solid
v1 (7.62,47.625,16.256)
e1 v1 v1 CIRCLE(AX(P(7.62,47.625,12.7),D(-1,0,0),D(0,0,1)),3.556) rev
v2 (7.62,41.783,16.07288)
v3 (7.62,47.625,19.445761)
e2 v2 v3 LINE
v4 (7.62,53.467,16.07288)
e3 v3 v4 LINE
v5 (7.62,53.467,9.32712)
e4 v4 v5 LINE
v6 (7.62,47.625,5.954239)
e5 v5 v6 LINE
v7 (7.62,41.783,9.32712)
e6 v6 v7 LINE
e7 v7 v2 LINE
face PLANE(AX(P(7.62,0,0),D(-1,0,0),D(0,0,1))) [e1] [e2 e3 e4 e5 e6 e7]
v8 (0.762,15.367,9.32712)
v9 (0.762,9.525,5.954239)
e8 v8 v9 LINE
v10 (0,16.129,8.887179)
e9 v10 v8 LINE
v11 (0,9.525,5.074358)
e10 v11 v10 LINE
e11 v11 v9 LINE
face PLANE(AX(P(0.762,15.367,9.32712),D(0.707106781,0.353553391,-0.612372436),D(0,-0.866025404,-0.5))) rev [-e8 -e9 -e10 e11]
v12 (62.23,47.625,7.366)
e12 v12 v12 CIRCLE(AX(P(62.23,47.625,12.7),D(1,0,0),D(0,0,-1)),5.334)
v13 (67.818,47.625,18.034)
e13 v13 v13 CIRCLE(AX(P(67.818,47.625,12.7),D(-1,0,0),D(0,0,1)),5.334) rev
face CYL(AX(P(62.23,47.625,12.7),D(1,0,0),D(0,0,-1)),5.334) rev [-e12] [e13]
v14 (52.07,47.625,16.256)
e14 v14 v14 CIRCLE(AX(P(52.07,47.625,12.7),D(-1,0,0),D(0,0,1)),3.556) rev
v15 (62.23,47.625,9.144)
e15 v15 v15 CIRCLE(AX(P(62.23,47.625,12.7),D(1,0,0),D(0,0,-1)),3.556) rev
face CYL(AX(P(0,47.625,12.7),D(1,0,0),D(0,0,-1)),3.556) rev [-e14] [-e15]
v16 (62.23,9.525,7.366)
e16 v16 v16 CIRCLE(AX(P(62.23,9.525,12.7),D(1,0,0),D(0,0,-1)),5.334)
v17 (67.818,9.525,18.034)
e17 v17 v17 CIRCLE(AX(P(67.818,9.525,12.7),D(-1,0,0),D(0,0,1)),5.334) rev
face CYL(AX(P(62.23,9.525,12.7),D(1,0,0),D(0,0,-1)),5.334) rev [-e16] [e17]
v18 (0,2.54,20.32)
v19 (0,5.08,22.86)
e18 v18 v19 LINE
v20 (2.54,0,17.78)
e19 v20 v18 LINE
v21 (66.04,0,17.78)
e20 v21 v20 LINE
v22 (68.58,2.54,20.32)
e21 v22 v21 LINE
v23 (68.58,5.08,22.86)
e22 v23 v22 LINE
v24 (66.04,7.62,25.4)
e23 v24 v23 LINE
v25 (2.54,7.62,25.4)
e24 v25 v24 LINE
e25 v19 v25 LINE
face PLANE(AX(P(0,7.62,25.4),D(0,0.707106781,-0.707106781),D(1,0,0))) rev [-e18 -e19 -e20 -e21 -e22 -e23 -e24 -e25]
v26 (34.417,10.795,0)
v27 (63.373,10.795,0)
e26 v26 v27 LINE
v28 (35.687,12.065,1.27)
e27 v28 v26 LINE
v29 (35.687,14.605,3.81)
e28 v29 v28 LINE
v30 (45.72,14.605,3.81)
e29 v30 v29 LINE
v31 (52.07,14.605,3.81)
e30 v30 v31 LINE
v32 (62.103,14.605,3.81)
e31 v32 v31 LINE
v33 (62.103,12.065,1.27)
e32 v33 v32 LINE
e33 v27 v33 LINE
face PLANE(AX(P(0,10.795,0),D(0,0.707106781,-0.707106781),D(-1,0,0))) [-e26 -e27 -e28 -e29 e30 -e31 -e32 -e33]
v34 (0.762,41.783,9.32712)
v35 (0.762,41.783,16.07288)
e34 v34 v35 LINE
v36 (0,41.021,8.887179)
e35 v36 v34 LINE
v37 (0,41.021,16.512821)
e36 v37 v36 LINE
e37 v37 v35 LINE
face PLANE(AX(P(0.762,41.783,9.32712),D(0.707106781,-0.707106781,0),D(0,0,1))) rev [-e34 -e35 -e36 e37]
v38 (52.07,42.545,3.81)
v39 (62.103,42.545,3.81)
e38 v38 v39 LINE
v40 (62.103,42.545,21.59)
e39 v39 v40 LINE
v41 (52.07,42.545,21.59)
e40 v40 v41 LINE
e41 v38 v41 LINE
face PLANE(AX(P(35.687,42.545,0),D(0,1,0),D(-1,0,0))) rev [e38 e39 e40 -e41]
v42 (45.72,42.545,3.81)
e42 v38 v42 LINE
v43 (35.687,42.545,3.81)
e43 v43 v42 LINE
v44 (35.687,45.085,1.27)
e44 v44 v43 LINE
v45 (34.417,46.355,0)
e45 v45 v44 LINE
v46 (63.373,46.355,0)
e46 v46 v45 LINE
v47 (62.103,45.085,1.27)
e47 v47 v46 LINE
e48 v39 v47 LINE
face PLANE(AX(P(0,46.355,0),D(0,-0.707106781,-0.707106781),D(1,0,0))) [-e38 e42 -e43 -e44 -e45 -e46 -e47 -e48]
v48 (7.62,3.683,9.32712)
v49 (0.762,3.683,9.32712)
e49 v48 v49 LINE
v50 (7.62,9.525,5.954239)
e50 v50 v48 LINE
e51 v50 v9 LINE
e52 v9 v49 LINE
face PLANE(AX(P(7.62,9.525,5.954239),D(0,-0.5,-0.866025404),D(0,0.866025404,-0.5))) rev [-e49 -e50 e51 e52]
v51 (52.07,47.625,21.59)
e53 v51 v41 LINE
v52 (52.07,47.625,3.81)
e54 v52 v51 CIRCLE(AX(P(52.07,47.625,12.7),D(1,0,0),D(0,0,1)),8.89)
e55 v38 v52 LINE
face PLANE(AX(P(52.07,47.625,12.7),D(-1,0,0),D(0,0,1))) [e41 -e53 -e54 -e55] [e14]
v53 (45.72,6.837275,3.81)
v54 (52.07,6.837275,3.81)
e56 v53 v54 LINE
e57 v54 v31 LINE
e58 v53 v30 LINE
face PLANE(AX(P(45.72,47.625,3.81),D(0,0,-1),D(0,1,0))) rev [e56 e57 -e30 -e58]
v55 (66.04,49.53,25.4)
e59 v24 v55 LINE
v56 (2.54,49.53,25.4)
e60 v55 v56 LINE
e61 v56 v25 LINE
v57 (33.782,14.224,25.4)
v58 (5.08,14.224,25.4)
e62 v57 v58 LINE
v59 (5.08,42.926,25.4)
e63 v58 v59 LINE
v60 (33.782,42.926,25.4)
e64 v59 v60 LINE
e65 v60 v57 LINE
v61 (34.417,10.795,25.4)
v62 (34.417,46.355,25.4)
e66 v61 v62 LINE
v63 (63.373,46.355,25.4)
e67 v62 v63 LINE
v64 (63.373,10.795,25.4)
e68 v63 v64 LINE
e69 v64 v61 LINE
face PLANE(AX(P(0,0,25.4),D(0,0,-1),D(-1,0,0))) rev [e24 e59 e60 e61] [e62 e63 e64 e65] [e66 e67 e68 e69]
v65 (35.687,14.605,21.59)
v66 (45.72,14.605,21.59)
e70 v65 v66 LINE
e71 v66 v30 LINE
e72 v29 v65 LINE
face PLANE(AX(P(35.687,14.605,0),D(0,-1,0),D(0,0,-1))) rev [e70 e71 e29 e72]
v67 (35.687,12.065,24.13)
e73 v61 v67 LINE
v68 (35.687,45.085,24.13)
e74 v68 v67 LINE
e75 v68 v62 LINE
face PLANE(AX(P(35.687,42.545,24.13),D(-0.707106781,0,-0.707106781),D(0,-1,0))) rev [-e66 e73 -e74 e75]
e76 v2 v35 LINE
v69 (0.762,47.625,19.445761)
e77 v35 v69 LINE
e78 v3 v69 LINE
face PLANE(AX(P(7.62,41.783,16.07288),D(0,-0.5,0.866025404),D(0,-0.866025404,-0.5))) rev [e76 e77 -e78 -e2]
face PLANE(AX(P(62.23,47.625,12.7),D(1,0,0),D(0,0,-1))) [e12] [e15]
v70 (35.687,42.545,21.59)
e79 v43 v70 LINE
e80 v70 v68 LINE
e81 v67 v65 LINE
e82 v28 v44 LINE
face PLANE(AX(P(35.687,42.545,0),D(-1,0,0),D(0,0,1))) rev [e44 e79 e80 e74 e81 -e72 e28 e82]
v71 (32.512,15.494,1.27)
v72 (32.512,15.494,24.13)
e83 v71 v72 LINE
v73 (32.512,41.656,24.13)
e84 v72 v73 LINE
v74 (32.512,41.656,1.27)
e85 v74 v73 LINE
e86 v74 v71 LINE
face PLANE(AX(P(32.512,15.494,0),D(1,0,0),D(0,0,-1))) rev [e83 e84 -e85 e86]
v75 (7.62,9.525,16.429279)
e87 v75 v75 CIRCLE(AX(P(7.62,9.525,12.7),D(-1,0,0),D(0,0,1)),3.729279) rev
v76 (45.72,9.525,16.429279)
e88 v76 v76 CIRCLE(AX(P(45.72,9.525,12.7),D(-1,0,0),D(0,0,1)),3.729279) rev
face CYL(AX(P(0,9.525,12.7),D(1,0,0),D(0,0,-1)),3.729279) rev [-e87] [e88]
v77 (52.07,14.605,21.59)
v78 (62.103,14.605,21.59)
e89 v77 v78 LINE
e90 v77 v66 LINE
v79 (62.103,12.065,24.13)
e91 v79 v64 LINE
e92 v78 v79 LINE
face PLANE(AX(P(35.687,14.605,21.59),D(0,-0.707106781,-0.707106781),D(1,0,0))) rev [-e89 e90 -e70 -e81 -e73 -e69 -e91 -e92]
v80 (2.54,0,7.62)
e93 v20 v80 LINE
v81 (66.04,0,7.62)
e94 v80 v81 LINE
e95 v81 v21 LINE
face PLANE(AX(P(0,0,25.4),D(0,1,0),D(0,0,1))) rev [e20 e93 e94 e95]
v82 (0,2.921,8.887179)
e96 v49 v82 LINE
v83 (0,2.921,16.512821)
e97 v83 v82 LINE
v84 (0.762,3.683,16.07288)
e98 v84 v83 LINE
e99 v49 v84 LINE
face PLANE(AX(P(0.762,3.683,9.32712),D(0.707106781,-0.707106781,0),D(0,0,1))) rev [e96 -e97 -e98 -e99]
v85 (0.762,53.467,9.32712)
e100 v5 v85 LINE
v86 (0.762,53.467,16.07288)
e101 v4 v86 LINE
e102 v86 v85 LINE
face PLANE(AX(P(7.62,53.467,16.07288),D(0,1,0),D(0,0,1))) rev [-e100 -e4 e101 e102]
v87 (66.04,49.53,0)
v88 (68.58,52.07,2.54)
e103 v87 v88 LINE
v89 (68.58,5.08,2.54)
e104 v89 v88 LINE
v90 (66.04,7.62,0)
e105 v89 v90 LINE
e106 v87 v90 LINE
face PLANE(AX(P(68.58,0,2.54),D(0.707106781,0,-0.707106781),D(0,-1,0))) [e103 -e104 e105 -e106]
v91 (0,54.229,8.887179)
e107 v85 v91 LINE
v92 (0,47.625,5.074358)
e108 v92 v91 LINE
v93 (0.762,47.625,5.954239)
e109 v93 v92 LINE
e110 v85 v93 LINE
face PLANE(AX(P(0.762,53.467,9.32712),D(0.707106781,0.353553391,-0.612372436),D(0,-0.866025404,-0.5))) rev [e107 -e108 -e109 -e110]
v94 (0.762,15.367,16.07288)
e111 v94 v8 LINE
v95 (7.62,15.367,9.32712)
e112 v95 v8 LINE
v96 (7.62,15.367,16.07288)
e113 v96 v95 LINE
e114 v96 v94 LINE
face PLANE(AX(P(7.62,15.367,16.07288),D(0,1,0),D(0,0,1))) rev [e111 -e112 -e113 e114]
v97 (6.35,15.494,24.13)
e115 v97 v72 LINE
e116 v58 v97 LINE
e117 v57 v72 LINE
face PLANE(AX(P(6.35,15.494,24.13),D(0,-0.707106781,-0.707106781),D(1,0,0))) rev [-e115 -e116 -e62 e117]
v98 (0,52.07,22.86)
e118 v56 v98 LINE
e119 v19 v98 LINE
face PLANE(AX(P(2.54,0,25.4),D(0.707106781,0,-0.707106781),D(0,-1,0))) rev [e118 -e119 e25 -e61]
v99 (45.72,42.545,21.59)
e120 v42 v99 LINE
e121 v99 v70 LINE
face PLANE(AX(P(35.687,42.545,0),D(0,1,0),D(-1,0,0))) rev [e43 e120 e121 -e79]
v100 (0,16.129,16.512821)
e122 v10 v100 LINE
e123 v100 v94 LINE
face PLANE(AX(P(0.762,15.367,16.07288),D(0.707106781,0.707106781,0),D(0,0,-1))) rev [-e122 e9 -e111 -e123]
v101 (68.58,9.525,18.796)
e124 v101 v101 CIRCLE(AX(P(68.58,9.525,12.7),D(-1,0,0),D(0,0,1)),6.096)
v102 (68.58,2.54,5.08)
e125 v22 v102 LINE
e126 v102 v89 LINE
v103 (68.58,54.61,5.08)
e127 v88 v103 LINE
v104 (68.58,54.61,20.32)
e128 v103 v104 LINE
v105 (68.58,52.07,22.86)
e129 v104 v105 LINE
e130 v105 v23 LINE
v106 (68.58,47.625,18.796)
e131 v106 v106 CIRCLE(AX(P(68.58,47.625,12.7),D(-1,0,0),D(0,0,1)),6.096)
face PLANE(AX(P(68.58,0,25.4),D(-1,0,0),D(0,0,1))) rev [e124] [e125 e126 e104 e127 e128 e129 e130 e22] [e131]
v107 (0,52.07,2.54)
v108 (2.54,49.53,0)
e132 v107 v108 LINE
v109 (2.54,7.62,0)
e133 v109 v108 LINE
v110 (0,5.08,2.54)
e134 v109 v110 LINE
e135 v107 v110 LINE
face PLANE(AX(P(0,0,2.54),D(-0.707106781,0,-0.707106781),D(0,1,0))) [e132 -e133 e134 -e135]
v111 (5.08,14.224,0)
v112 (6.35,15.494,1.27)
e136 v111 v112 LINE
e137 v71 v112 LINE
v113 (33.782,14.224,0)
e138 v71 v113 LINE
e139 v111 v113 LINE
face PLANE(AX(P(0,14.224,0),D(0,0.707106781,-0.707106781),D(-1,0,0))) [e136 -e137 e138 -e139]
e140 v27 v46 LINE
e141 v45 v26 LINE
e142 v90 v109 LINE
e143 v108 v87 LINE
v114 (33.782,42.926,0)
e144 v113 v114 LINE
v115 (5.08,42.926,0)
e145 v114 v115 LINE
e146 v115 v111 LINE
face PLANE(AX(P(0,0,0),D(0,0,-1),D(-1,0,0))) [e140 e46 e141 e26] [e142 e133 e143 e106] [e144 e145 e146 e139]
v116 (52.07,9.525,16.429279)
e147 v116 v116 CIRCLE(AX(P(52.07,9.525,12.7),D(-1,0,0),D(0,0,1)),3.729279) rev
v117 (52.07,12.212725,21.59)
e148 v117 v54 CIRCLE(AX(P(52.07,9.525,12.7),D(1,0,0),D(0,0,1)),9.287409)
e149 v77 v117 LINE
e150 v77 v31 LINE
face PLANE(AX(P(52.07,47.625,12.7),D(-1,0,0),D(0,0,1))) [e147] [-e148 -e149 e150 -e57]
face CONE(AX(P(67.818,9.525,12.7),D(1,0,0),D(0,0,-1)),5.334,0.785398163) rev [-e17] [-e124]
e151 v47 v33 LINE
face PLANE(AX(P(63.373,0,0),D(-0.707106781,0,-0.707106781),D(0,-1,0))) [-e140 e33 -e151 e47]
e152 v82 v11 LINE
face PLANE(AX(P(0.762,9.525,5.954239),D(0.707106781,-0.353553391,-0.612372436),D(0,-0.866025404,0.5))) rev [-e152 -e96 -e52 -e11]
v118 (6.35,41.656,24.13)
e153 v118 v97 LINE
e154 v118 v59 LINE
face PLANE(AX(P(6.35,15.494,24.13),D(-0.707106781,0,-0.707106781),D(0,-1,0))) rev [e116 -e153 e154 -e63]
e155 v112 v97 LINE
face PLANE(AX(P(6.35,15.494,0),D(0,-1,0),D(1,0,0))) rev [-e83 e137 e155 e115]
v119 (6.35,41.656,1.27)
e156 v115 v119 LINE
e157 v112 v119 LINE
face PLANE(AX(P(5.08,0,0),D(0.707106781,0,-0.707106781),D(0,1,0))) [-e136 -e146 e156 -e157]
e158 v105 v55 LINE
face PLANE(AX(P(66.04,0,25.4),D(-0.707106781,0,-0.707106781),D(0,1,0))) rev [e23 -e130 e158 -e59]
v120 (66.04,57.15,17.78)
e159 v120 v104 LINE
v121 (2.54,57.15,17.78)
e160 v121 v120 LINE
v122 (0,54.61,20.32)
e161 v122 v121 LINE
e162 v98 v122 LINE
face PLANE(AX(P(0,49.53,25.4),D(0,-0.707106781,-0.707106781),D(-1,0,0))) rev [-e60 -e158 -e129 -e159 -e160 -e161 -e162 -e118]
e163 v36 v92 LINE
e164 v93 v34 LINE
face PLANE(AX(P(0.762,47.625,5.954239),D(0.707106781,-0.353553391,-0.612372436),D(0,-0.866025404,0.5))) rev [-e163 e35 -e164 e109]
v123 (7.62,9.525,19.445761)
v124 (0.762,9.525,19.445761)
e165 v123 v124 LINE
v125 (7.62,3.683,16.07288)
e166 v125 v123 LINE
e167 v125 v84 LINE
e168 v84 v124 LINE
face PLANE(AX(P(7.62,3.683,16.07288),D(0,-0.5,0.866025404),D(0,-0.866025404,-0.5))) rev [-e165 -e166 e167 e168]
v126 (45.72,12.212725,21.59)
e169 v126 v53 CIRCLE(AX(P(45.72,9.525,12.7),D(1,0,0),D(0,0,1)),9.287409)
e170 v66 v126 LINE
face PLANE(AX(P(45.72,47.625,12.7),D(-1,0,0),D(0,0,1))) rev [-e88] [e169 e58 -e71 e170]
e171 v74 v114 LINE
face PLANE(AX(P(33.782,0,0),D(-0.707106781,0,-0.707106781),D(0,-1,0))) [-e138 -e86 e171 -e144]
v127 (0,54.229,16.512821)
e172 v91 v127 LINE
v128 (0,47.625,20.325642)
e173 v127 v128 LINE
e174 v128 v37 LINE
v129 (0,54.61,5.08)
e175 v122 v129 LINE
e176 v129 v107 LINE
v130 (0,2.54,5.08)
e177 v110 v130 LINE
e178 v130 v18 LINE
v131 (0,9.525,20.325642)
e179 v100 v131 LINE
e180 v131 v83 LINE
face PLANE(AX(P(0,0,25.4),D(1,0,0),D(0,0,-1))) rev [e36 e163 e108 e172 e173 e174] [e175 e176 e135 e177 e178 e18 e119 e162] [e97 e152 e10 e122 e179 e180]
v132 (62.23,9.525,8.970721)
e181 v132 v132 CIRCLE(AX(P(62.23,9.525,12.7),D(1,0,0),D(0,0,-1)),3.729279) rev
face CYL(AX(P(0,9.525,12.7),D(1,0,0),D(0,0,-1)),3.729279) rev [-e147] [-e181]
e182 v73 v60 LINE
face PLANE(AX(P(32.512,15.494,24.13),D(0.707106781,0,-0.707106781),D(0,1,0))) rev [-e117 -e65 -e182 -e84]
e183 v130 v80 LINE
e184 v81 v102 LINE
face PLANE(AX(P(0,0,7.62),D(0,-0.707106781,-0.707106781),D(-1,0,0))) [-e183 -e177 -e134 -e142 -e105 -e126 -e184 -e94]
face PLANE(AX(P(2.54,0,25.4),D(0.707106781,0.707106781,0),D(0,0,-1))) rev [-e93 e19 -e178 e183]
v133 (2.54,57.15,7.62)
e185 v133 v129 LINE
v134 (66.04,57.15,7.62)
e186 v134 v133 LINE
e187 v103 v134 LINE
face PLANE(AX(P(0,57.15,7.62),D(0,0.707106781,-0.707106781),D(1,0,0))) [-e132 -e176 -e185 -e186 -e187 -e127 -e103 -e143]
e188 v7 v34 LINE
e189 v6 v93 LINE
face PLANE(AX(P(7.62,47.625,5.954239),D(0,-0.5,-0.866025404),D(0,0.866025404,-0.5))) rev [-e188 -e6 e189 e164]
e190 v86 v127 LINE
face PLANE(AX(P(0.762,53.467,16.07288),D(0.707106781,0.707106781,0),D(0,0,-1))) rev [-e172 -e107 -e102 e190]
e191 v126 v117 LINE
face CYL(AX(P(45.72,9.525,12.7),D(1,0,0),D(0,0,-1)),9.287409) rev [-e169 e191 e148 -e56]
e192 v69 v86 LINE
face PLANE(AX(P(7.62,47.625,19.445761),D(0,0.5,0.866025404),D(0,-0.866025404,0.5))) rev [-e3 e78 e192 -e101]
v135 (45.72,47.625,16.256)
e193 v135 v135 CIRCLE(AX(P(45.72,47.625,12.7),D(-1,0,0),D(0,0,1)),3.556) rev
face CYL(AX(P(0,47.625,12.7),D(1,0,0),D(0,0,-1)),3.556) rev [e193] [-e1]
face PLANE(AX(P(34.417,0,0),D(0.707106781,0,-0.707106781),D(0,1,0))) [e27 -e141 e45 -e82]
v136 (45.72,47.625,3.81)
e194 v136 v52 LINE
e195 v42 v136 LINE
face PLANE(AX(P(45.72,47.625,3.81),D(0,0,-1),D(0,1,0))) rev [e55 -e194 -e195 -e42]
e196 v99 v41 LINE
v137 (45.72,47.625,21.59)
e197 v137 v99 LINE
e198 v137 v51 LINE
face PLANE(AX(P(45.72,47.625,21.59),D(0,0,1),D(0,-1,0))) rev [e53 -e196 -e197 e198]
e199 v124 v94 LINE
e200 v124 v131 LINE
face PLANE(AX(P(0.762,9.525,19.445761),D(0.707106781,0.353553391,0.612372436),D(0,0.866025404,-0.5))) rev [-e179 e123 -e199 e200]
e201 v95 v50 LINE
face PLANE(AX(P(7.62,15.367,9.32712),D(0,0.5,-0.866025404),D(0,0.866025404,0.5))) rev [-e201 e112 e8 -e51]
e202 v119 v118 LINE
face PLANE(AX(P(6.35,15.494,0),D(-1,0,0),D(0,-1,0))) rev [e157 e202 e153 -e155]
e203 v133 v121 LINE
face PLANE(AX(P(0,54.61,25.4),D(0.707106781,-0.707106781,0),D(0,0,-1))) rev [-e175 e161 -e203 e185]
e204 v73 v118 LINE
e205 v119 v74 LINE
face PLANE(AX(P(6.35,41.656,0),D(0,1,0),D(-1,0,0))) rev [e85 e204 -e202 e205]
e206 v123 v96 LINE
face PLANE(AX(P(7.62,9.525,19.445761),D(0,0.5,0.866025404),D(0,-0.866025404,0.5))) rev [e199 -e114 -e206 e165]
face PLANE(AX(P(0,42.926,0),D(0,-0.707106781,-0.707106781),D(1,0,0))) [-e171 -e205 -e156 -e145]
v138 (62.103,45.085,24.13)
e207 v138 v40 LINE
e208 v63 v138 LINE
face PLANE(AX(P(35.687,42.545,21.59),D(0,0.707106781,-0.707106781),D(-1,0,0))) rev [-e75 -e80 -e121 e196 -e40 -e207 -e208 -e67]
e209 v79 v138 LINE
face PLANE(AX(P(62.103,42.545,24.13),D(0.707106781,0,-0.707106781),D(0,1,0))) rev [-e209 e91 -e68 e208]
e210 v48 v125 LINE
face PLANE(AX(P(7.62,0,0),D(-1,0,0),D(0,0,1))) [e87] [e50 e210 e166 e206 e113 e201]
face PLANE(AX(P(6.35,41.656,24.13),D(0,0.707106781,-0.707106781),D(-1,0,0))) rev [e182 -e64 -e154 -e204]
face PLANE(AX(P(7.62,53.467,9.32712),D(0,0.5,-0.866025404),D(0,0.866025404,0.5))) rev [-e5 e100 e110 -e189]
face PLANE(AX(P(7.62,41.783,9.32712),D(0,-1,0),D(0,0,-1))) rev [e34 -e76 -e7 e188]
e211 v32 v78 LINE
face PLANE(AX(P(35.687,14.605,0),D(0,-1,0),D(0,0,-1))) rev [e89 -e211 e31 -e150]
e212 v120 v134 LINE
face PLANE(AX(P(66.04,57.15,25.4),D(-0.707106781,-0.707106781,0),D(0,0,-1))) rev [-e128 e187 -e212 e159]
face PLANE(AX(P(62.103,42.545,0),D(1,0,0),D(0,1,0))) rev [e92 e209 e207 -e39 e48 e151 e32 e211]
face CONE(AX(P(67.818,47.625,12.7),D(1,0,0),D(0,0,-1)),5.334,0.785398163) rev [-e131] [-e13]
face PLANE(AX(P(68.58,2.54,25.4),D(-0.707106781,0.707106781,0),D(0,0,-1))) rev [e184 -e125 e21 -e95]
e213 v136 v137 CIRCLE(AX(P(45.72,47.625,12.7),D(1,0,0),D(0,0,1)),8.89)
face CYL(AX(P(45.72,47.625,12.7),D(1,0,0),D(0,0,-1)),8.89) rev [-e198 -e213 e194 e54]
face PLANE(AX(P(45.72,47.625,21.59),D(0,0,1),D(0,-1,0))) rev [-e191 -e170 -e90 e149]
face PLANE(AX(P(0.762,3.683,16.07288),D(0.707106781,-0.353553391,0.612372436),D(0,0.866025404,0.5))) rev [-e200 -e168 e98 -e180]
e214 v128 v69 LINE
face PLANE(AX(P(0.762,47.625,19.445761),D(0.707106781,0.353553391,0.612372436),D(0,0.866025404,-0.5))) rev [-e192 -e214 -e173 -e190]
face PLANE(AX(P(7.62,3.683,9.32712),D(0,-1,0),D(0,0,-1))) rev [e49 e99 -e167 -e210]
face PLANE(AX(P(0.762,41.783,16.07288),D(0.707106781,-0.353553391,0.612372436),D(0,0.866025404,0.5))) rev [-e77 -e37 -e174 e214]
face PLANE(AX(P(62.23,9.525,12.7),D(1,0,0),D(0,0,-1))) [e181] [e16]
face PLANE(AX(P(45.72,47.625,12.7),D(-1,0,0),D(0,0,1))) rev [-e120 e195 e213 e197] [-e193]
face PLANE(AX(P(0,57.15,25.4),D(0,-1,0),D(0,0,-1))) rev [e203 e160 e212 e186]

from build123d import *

# Parameters (mm, degrees)
SKETCH1_W           = 68.58
SKETCH1_H           = 57.15
BOSS_EXTRUDE1_DEPTH = 25.4
SKETCH2_W           = 26.162
SKETCH2_H           = 26.162
SKETCH2_W_2         = 26.416
SKETCH2_H_2         = 27.94
CUT_EXTRUDE1_DEPTH  = 93.814324864
SKETCH5_R           = 3.556
SKETCH5_R_2         = 3.729278609
CUT_EXTRUDE2_DEPTH  = 93.814324864
CUT_EXTRUDE3_START  = -16.51
CUT_EXTRUDE3_DEPTH  = 6.35
CHAMFER1_SIZE       = 1.27
CHAMFER2_SIZE       = 2.54
CHAMFER3_SIZE       = 7.62
SKETCH7_R           = 5.334
CUT_EXTRUDE4_DEPTH  = 6.35
CUT_EXTRUDE5_DEPTH  = 7.62
CHAMFER4_SIZE       = 0.762
CHAMFER5_SIZE       = 3.81


with BuildPart() as part:
    # Sketch1 → Boss-Extrude1 (new body)
    with BuildSketch(Plane.XY):
        with Locations((34.29, 28.575)):
            Rectangle(SKETCH1_W, SKETCH1_H)
    extrude(amount=BOSS_EXTRUDE1_DEPTH)

    # Sketch2 → Cut-Extrude1 (cut, through all)
    with BuildSketch(Plane.XY.offset(25.4)):
        with Locations((19.431, 28.575)):
            Rectangle(SKETCH2_W, SKETCH2_H)
        with Locations((48.895, 28.575)):
            Rectangle(SKETCH2_W_2, SKETCH2_H_2)
    extrude(amount=-CUT_EXTRUDE1_DEPTH, mode=Mode.SUBTRACT)

    # Sketch5 → Cut-Extrude2 (cut, through all)
    with BuildSketch(Plane(origin=(68.58, 0, 0), x_dir=(0, 0, -1), z_dir=(1, 0, 0))):
        with Locations((-12.7, 47.625)):
            Circle(SKETCH5_R)
        with Locations((-12.7, 9.525)):
            Circle(SKETCH5_R_2)
    extrude(amount=-CUT_EXTRUDE2_DEPTH, mode=Mode.SUBTRACT)

    # Sketch6 → Cut-Extrude3 (cut)
    with BuildSketch(Plane(origin=(68.58, 0, 0), x_dir=(0, 0, -1), z_dir=(1, 0, 0)).offset(CUT_EXTRUDE3_START)):
        with BuildLine():
            Line((-21.59, 47.625), (-21.59, 12.21272508))
            ThreePointArc((-21.59, 12.21272508), (-15.38772508, 0.635), (-3.81, 6.83727492))
            Line((-3.81, 6.83727492), (-3.81, 47.625))
            ThreePointArc((-3.81, 47.625), (-12.7, 56.515), (-21.59, 47.625))
        make_face()
    extrude(amount=-CUT_EXTRUDE3_DEPTH, mode=Mode.SUBTRACT)

    # Chamfer1
    chamfer1_edges = [part.edges().sort_by_distance(p)[0] for p in [
        (6.35, 28.575, 0),
        (19.431, 41.656, 0),
        (32.512, 28.575, 0),
        (19.431, 15.494, 0),
        (6.35, 28.575, 25.4),
        (19.431, 15.494, 25.4),
        (32.512, 28.575, 25.4),
        (19.431, 41.656, 25.4),
        (35.687, 28.575, 0),
        (62.103, 28.575, 0),
        (35.687, 28.575, 25.4),
        (62.103, 28.575, 25.4),
    ]]
    chamfer(chamfer1_edges, length=CHAMFER1_SIZE)

    # Chamfer2
    chamfer2_edges = [part.edges().sort_by_distance(p)[0] for p in [
        (68.58, 28.575, 25.4),
        (0, 28.575, 25.4),
        (68.58, 28.575, 0),
        (0, 28.575, 0),
        (0, 57.15, 12.7),
        (68.58, 57.15, 12.7),
        (68.58, 0, 12.7),
        (0, 0, 12.7),
    ]]
    chamfer(chamfer2_edges, length=CHAMFER2_SIZE)

    # Chamfer3
    # the kernel refuses this chamfer: 7.62 mm, written as the material it takes off along each edge
    with BuildSketch(Plane(origin=(-17.056224368, 0, 0), x_dir=(0, 1, 0), z_dir=(1, 0, 0)), Plane(origin=(-17.056224368, 0, 25.4), x_dir=(0, 0, -1), z_dir=(1, 0, 0)), Plane(origin=(85.636224368, 57.15, 0), x_dir=(0, -1, 0), z_dir=(-1, 0, 0)), Plane(origin=(85.636224368, 57.15, 25.4), x_dir=(0, 0, -1), z_dir=(-1, 0, 0))) as chamfer3_piece_1:
        Polygon((CHAMFER3_SIZE, 0), (0, CHAMFER3_SIZE), (0, 0), align=None)
    extrude(amount=102.692448737, mode=Mode.SUBTRACT)

    # Sketch7 → Cut-Extrude4 (cut)
    with BuildSketch(Plane(origin=(68.58, 0, 0), x_dir=(0, 0, -1), z_dir=(1, 0, 0))):
        with Locations((-12.7, 47.625)):
            Circle(SKETCH7_R)
        with Locations((-12.7, 9.525)):
            Circle(SKETCH7_R)
    extrude(amount=-CUT_EXTRUDE4_DEPTH, mode=Mode.SUBTRACT)

    # Sketch9 → Cut-Extrude5 (cut)
    with BuildSketch(Plane.ZY):
        Polygon((16.072880273, 53.467), (9.327119727, 53.467), (5.954239455, 47.625), (9.327119727, 41.783), (16.072880273, 41.783), (19.445760545, 47.625), align=None)
        Polygon((16.072880273, 15.367), (9.327119727, 15.367), (5.954239455, 9.525), (9.327119727, 3.683), (16.072880273, 3.683), (19.445760545, 9.525), align=None)
    extrude(amount=-CUT_EXTRUDE5_DEPTH, mode=Mode.SUBTRACT)

    # Chamfer4
    chamfer4_edges = [part.edges().sort_by_distance(p)[0] for p in [
        (68.58, 47.625, 18.034),
        (68.58, 9.525, 18.034),
        (0, 50.546, 17.759320409),
        (0, 53.467, 12.7),
        (0, 50.546, 7.640679591),
        (0, 44.704, 7.640679591),
        (0, 41.783, 12.7),
        (0, 44.704, 17.759320409),
        (0, 12.446, 17.759320409),
        (0, 15.367, 12.7),
        (0, 12.446, 7.640679591),
        (0, 6.604, 7.640679591),
        (0, 3.683, 12.7),
        (0, 6.604, 17.759320409),
    ]]
    chamfer(chamfer4_edges, length=CHAMFER4_SIZE)

    # Chamfer5
    # the kernel refuses this chamfer: 3.81 mm, written as the material it takes off along each edge
    with BuildSketch(Plane(origin=(24.618887816, 14.605, 0), x_dir=(0, -1, 0), z_dir=(1, 0, 0))) as chamfer5_piece_1_section:
        Polygon((CHAMFER5_SIZE, 0), (0, -CHAMFER5_SIZE), (0, 0), align=None)
    chamfer5_piece_1 = extrude(amount=48.552224368, mode=Mode.PRIVATE)
    chamfer5_piece_1 = split(chamfer5_piece_1, bisect_by=Plane(origin=(29.517943908, 14.605, -4.899056092), z_dir=(-0.7071067811865467, 0, 0.7071067811865483)), keep=Keep.TOP, mode=Mode.PRIVATE)
    chamfer5_piece_1 = split(chamfer5_piece_1, bisect_by=Plane(origin=(35.687, 14.605, 0), z_dir=(1, 0, 0)), keep=Keep.TOP, mode=Mode.PRIVATE)
    add(chamfer5_piece_1, mode=Mode.SUBTRACT)
    with BuildSketch(Plane(origin=(24.618887816, 14.605, 0), x_dir=(0, -1, 0), z_dir=(1, 0, 0))) as chamfer5_piece_2_section:
        Polygon((CHAMFER5_SIZE, 0), (0, -CHAMFER5_SIZE), (0, 0), align=None)
    chamfer5_piece_2 = extrude(amount=48.552224368, mode=Mode.PRIVATE)
    chamfer5_piece_2 = split(chamfer5_piece_2, bisect_by=Plane(origin=(29.517943908, 14.605, -4.899056092), z_dir=(0.7071067811865467, 0, -0.7071067811865483)), keep=Keep.TOP, mode=Mode.PRIVATE)
    chamfer5_piece_2 = split(chamfer5_piece_2, bisect_by=Plane(origin=(35.687, 14.605, 0), z_dir=(-1, 0, 0)), keep=Keep.TOP, mode=Mode.PRIVATE)
    add(chamfer5_piece_2, mode=Mode.SUBTRACT)
    with BuildSketch(Plane(origin=(24.618887816, 14.605, 0), x_dir=(0, -1, 0), z_dir=(1, 0, 0))) as chamfer5_piece_3_section:
        Polygon((CHAMFER5_SIZE, 0), (0, -CHAMFER5_SIZE), (0, 0), align=None)
    chamfer5_piece_3 = extrude(amount=48.552224368, mode=Mode.PRIVATE)
    chamfer5_piece_3 = split(chamfer5_piece_3, bisect_by=Plane(origin=(62.103, 14.605, 0), z_dir=(-1, 0, 0)), keep=Keep.TOP, mode=Mode.PRIVATE)
    chamfer5_piece_3 = split(chamfer5_piece_3, bisect_by=Plane(origin=(43.995943908, 14.605, 19.377056092), z_dir=(-0.7071067811865467, 0, -0.7071067811865483)), keep=Keep.TOP, mode=Mode.PRIVATE)
    chamfer5_piece_3 = split(chamfer5_piece_3, bisect_by=Plane(origin=(29.517943908, 14.605, -4.899056092), z_dir=(0.7071067811865467, 0, -0.7071067811865483)), keep=Keep.TOP, mode=Mode.PRIVATE)
    chamfer5_piece_3 = split(chamfer5_piece_3, bisect_by=Plane(origin=(35.687, 14.605, 0), z_dir=(1, 0, 0)), keep=Keep.TOP, mode=Mode.PRIVATE)
    add(chamfer5_piece_3, mode=Mode.SUBTRACT)
    with BuildSketch(Plane(origin=(24.618887816, 14.605, 0), x_dir=(0, -1, 0), z_dir=(1, 0, 0))) as chamfer5_piece_4_section:
        Polygon((CHAMFER5_SIZE, 0), (0, -CHAMFER5_SIZE), (0, 0), align=None)
    chamfer5_piece_4 = extrude(amount=48.552224368, mode=Mode.PRIVATE)
    chamfer5_piece_4 = split(chamfer5_piece_4, bisect_by=Plane(origin=(62.103, 14.605, 0), z_dir=(-1, 0, 0)), keep=Keep.TOP, mode=Mode.PRIVATE)
    chamfer5_piece_4 = split(chamfer5_piece_4, bisect_by=Plane(origin=(43.995943908, 14.605, 19.377056092), z_dir=(0.7071067811865467, 0, 0.7071067811865483)), keep=Keep.TOP, mode=Mode.PRIVATE)
    add(chamfer5_piece_4, mode=Mode.SUBTRACT)
    with BuildSketch(Plane(origin=(24.618887816, 14.605, 0), x_dir=(0, -1, 0), z_dir=(1, 0, 0))) as chamfer5_piece_5_section:
        Polygon((CHAMFER5_SIZE, 0), (0, -CHAMFER5_SIZE), (0, 0), align=None)
    chamfer5_piece_5 = extrude(amount=48.552224368, mode=Mode.PRIVATE)
    chamfer5_piece_5 = split(chamfer5_piece_5, bisect_by=Plane(origin=(62.103, 14.605, 0), z_dir=(1, 0, 0)), keep=Keep.TOP, mode=Mode.PRIVATE)
    chamfer5_piece_5 = split(chamfer5_piece_5, bisect_by=Plane(origin=(43.995943908, 14.605, 19.377056092), z_dir=(-0.7071067811865467, 0, -0.7071067811865483)), keep=Keep.TOP, mode=Mode.PRIVATE)
    add(chamfer5_piece_5, mode=Mode.SUBTRACT)
    with BuildSketch(Plane(origin=(73.171112184, 42.545, 0), x_dir=(0, 1, 0), z_dir=(-1, 0, 0))) as chamfer5_piece_6_section:
        Polygon((CHAMFER5_SIZE, 0), (0, -CHAMFER5_SIZE), (0, 0), align=None)
    chamfer5_piece_6 = extrude(amount=48.552224368, mode=Mode.PRIVATE)
    chamfer5_piece_6 = split(chamfer5_piece_6, bisect_by=Plane(origin=(68.272056092, 42.545, -4.899056092), z_dir=(0.7071067811865467, 0, 0.7071067811865483)), keep=Keep.TOP, mode=Mode.PRIVATE)
    chamfer5_piece_6 = split(chamfer5_piece_6, bisect_by=Plane(origin=(62.103, 42.545, 0), z_dir=(-1, 0, 0)), keep=Keep.TOP, mode=Mode.PRIVATE)
    add(chamfer5_piece_6, mode=Mode.SUBTRACT)
    with BuildSketch(Plane(origin=(73.171112184, 42.545, 0), x_dir=(0, 1, 0), z_dir=(-1, 0, 0))) as chamfer5_piece_7_section:
        Polygon((CHAMFER5_SIZE, 0), (0, -CHAMFER5_SIZE), (0, 0), align=None)
    chamfer5_piece_7 = extrude(amount=48.552224368, mode=Mode.PRIVATE)
    chamfer5_piece_7 = split(chamfer5_piece_7, bisect_by=Plane(origin=(68.272056092, 42.545, -4.899056092), z_dir=(-0.7071067811865467, 0, -0.7071067811865483)), keep=Keep.TOP, mode=Mode.PRIVATE)
    chamfer5_piece_7 = split(chamfer5_piece_7, bisect_by=Plane(origin=(62.103, 42.545, 0), z_dir=(1, 0, 0)), keep=Keep.TOP, mode=Mode.PRIVATE)
    add(chamfer5_piece_7, mode=Mode.SUBTRACT)
    with BuildSketch(Plane(origin=(73.171112184, 42.545, 0), x_dir=(0, 1, 0), z_dir=(-1, 0, 0))) as chamfer5_piece_8_section:
        Polygon((CHAMFER5_SIZE, 0), (0, -CHAMFER5_SIZE), (0, 0), align=None)
    chamfer5_piece_8 = extrude(amount=48.552224368, mode=Mode.PRIVATE)
    chamfer5_piece_8 = split(chamfer5_piece_8, bisect_by=Plane(origin=(35.687, 42.545, 0), z_dir=(1, 0, 0)), keep=Keep.TOP, mode=Mode.PRIVATE)
    chamfer5_piece_8 = split(chamfer5_piece_8, bisect_by=Plane(origin=(53.794056092, 42.545, 19.377056092), z_dir=(0.7071067811865467, 0, -0.7071067811865483)), keep=Keep.TOP, mode=Mode.PRIVATE)
    chamfer5_piece_8 = split(chamfer5_piece_8, bisect_by=Plane(origin=(68.272056092, 42.545, -4.899056092), z_dir=(-0.7071067811865467, 0, -0.7071067811865483)), keep=Keep.TOP, mode=Mode.PRIVATE)
    chamfer5_piece_8 = split(chamfer5_piece_8, bisect_by=Plane(origin=(62.103, 42.545, 0), z_dir=(-1, 0, 0)), keep=Keep.TOP, mode=Mode.PRIVATE)
    add(chamfer5_piece_8, mode=Mode.SUBTRACT)
    with BuildSketch(Plane(origin=(73.171112184, 42.545, 0), x_dir=(0, 1, 0), z_dir=(-1, 0, 0))) as chamfer5_piece_9_section:
        Polygon((CHAMFER5_SIZE, 0), (0, -CHAMFER5_SIZE), (0, 0), align=None)
    chamfer5_piece_9 = extrude(amount=48.552224368, mode=Mode.PRIVATE)
    chamfer5_piece_9 = split(chamfer5_piece_9, bisect_by=Plane(origin=(35.687, 42.545, 0), z_dir=(1, 0, 0)), keep=Keep.TOP, mode=Mode.PRIVATE)
    chamfer5_piece_9 = split(chamfer5_piece_9, bisect_by=Plane(origin=(53.794056092, 42.545, 19.377056092), z_dir=(-0.7071067811865467, 0, 0.7071067811865483)), keep=Keep.TOP, mode=Mode.PRIVATE)
    add(chamfer5_piece_9, mode=Mode.SUBTRACT)
    with BuildSketch(Plane(origin=(73.171112184, 42.545, 0), x_dir=(0, 1, 0), z_dir=(-1, 0, 0))) as chamfer5_piece_10_section:
        Polygon((CHAMFER5_SIZE, 0), (0, -CHAMFER5_SIZE), (0, 0), align=None)
    chamfer5_piece_10 = extrude(amount=48.552224368, mode=Mode.PRIVATE)
    chamfer5_piece_10 = split(chamfer5_piece_10, bisect_by=Plane(origin=(35.687, 42.545, 0), z_dir=(-1, 0, 0)), keep=Keep.TOP, mode=Mode.PRIVATE)
    chamfer5_piece_10 = split(chamfer5_piece_10, bisect_by=Plane(origin=(53.794056092, 42.545, 19.377056092), z_dir=(0.7071067811865467, 0, -0.7071067811865483)), keep=Keep.TOP, mode=Mode.PRIVATE)
    add(chamfer5_piece_10, mode=Mode.SUBTRACT)
    with BuildSketch(Plane(origin=(73.171112184, 42.545, 25.4), x_dir=(0, 1, 0), z_dir=(-1, 0, 0))) as chamfer5_piece_11_section:
        Polygon((CHAMFER5_SIZE, 0), (0, CHAMFER5_SIZE), (0, 0), align=None)
    chamfer5_piece_11 = extrude(amount=48.552224368, mode=Mode.PRIVATE)
    chamfer5_piece_11 = split(chamfer5_piece_11, bisect_by=Plane(origin=(68.272056092, 42.545, 30.299056092), z_dir=(0.7071067811865465, 0, -0.7071067811865486)), keep=Keep.TOP, mode=Mode.PRIVATE)
    chamfer5_piece_11 = split(chamfer5_piece_11, bisect_by=Plane(origin=(62.103, 42.545, 25.4), z_dir=(-1, 0, 0)), keep=Keep.TOP, mode=Mode.PRIVATE)
    add(chamfer5_piece_11, mode=Mode.SUBTRACT)
    with BuildSketch(Plane(origin=(73.171112184, 42.545, 25.4), x_dir=(0, 1, 0), z_dir=(-1, 0, 0))) as chamfer5_piece_12_section:
        Polygon((CHAMFER5_SIZE, 0), (0, CHAMFER5_SIZE), (0, 0), align=None)
    chamfer5_piece_12 = extrude(amount=48.552224368, mode=Mode.PRIVATE)
    chamfer5_piece_12 = split(chamfer5_piece_12, bisect_by=Plane(origin=(68.272056092, 42.545, 30.299056092), z_dir=(-0.7071067811865465, 0, 0.7071067811865486)), keep=Keep.TOP, mode=Mode.PRIVATE)
    chamfer5_piece_12 = split(chamfer5_piece_12, bisect_by=Plane(origin=(62.103, 42.545, 25.4), z_dir=(1, 0, 0)), keep=Keep.TOP, mode=Mode.PRIVATE)
    add(chamfer5_piece_12, mode=Mode.SUBTRACT)
    with BuildSketch(Plane(origin=(73.171112184, 42.545, 25.4), x_dir=(0, 1, 0), z_dir=(-1, 0, 0))) as chamfer5_piece_13_section:
        Polygon((CHAMFER5_SIZE, 0), (0, CHAMFER5_SIZE), (0, 0), align=None)
    chamfer5_piece_13 = extrude(amount=48.552224368, mode=Mode.PRIVATE)
    chamfer5_piece_13 = split(chamfer5_piece_13, bisect_by=Plane(origin=(53.794056092, 42.545, 6.022943908), z_dir=(0.7071067811865465, 0, 0.7071067811865486)), keep=Keep.TOP, mode=Mode.PRIVATE)
    chamfer5_piece_13 = split(chamfer5_piece_13, bisect_by=Plane(origin=(68.272056092, 42.545, 30.299056092), z_dir=(-0.7071067811865465, 0, 0.7071067811865486)), keep=Keep.TOP, mode=Mode.PRIVATE)
    chamfer5_piece_13 = split(chamfer5_piece_13, bisect_by=Plane(origin=(35.687, 42.545, 25.4), z_dir=(1, 0, 0)), keep=Keep.TOP, mode=Mode.PRIVATE)
    chamfer5_piece_13 = split(chamfer5_piece_13, bisect_by=Plane(origin=(62.103, 42.545, 25.4), z_dir=(-1, 0, 0)), keep=Keep.TOP, mode=Mode.PRIVATE)
    add(chamfer5_piece_13, mode=Mode.SUBTRACT)
    with BuildSketch(Plane(origin=(73.171112184, 42.545, 25.4), x_dir=(0, 1, 0), z_dir=(-1, 0, 0))) as chamfer5_piece_14_section:
        Polygon((CHAMFER5_SIZE, 0), (0, CHAMFER5_SIZE), (0, 0), align=None)
    chamfer5_piece_14 = extrude(amount=48.552224368, mode=Mode.PRIVATE)
    chamfer5_piece_14 = split(chamfer5_piece_14, bisect_by=Plane(origin=(53.794056092, 42.545, 6.022943908), z_dir=(-0.7071067811865465, 0, -0.7071067811865486)), keep=Keep.TOP, mode=Mode.PRIVATE)
    chamfer5_piece_14 = split(chamfer5_piece_14, bisect_by=Plane(origin=(35.687, 42.545, 25.4), z_dir=(1, 0, 0)), keep=Keep.TOP, mode=Mode.PRIVATE)
    add(chamfer5_piece_14, mode=Mode.SUBTRACT)
    with BuildSketch(Plane(origin=(73.171112184, 42.545, 25.4), x_dir=(0, 1, 0), z_dir=(-1, 0, 0))) as chamfer5_piece_15_section:
        Polygon((CHAMFER5_SIZE, 0), (0, CHAMFER5_SIZE), (0, 0), align=None)
    chamfer5_piece_15 = extrude(amount=48.552224368, mode=Mode.PRIVATE)
    chamfer5_piece_15 = split(chamfer5_piece_15, bisect_by=Plane(origin=(53.794056092, 42.545, 6.022943908), z_dir=(0.7071067811865465, 0, 0.7071067811865486)), keep=Keep.TOP, mode=Mode.PRIVATE)
    chamfer5_piece_15 = split(chamfer5_piece_15, bisect_by=Plane(origin=(35.687, 42.545, 25.4), z_dir=(-1, 0, 0)), keep=Keep.TOP, mode=Mode.PRIVATE)
    add(chamfer5_piece_15, mode=Mode.SUBTRACT)
    with BuildSketch(Plane(origin=(24.618887816, 14.605, 25.4), x_dir=(0, -1, 0), z_dir=(1, 0, 0))) as chamfer5_piece_16_section:
        Polygon((CHAMFER5_SIZE, 0), (0, CHAMFER5_SIZE), (0, 0), align=None)
    chamfer5_piece_16 = extrude(amount=48.552224368, mode=Mode.PRIVATE)
    chamfer5_piece_16 = split(chamfer5_piece_16, bisect_by=Plane(origin=(35.687, 14.605, 25.4), z_dir=(1, 0, 0)), keep=Keep.TOP, mode=Mode.PRIVATE)
    chamfer5_piece_16 = split(chamfer5_piece_16, bisect_by=Plane(origin=(29.517943908, 14.605, 30.299056092), z_dir=(-0.7071067811865465, 0, -0.7071067811865486)), keep=Keep.TOP, mode=Mode.PRIVATE)
    add(chamfer5_piece_16, mode=Mode.SUBTRACT)
    with BuildSketch(Plane(origin=(24.618887816, 14.605, 25.4), x_dir=(0, -1, 0), z_dir=(1, 0, 0))) as chamfer5_piece_17_section:
        Polygon((CHAMFER5_SIZE, 0), (0, CHAMFER5_SIZE), (0, 0), align=None)
    chamfer5_piece_17 = extrude(amount=48.552224368, mode=Mode.PRIVATE)
    chamfer5_piece_17 = split(chamfer5_piece_17, bisect_by=Plane(origin=(35.687, 14.605, 25.4), z_dir=(-1, 0, 0)), keep=Keep.TOP, mode=Mode.PRIVATE)
    chamfer5_piece_17 = split(chamfer5_piece_17, bisect_by=Plane(origin=(29.517943908, 14.605, 30.299056092), z_dir=(0.7071067811865465, 0, 0.7071067811865486)), keep=Keep.TOP, mode=Mode.PRIVATE)
    add(chamfer5_piece_17, mode=Mode.SUBTRACT)
    with BuildSketch(Plane(origin=(24.618887816, 14.605, 25.4), x_dir=(0, -1, 0), z_dir=(1, 0, 0))) as chamfer5_piece_18_section:
        Polygon((CHAMFER5_SIZE, 0), (0, CHAMFER5_SIZE), (0, 0), align=None)
    chamfer5_piece_18 = extrude(amount=48.552224368, mode=Mode.PRIVATE)
    chamfer5_piece_18 = split(chamfer5_piece_18, bisect_by=Plane(origin=(62.103, 14.605, 25.4), z_dir=(-1, 0, 0)), keep=Keep.TOP, mode=Mode.PRIVATE)
    chamfer5_piece_18 = split(chamfer5_piece_18, bisect_by=Plane(origin=(35.687, 14.605, 25.4), z_dir=(1, 0, 0)), keep=Keep.TOP, mode=Mode.PRIVATE)
    chamfer5_piece_18 = split(chamfer5_piece_18, bisect_by=Plane(origin=(29.517943908, 14.605, 30.299056092), z_dir=(0.7071067811865465, 0, 0.7071067811865486)), keep=Keep.TOP, mode=Mode.PRIVATE)
    chamfer5_piece_18 = split(chamfer5_piece_18, bisect_by=Plane(origin=(43.995943908, 14.605, 6.022943908), z_dir=(-0.7071067811865465, 0, 0.7071067811865486)), keep=Keep.TOP, mode=Mode.PRIVATE)
    add(chamfer5_piece_18, mode=Mode.SUBTRACT)
    with BuildSketch(Plane(origin=(24.618887816, 14.605, 25.4), x_dir=(0, -1, 0), z_dir=(1, 0, 0))) as chamfer5_piece_19_section:
        Polygon((CHAMFER5_SIZE, 0), (0, CHAMFER5_SIZE), (0, 0), align=None)
    chamfer5_piece_19 = extrude(amount=48.552224368, mode=Mode.PRIVATE)
    chamfer5_piece_19 = split(chamfer5_piece_19, bisect_by=Plane(origin=(62.103, 14.605, 25.4), z_dir=(-1, 0, 0)), keep=Keep.TOP, mode=Mode.PRIVATE)
    chamfer5_piece_19 = split(chamfer5_piece_19, bisect_by=Plane(origin=(43.995943908, 14.605, 6.022943908), z_dir=(0.7071067811865465, 0, -0.7071067811865486)), keep=Keep.TOP, mode=Mode.PRIVATE)
    add(chamfer5_piece_19, mode=Mode.SUBTRACT)
    with BuildSketch(Plane(origin=(24.618887816, 14.605, 25.4), x_dir=(0, -1, 0), z_dir=(1, 0, 0))) as chamfer5_piece_20_section:
        Polygon((CHAMFER5_SIZE, 0), (0, CHAMFER5_SIZE), (0, 0), align=None)
    chamfer5_piece_20 = extrude(amount=48.552224368, mode=Mode.PRIVATE)
    chamfer5_piece_20 = split(chamfer5_piece_20, bisect_by=Plane(origin=(62.103, 14.605, 25.4), z_dir=(1, 0, 0)), keep=Keep.TOP, mode=Mode.PRIVATE)
    chamfer5_piece_20 = split(chamfer5_piece_20, bisect_by=Plane(origin=(43.995943908, 14.605, 6.022943908), z_dir=(-0.7071067811865465, 0, 0.7071067811865486)), keep=Keep.TOP, mode=Mode.PRIVATE)
    add(chamfer5_piece_20, mode=Mode.SUBTRACT)


solid = part.part
